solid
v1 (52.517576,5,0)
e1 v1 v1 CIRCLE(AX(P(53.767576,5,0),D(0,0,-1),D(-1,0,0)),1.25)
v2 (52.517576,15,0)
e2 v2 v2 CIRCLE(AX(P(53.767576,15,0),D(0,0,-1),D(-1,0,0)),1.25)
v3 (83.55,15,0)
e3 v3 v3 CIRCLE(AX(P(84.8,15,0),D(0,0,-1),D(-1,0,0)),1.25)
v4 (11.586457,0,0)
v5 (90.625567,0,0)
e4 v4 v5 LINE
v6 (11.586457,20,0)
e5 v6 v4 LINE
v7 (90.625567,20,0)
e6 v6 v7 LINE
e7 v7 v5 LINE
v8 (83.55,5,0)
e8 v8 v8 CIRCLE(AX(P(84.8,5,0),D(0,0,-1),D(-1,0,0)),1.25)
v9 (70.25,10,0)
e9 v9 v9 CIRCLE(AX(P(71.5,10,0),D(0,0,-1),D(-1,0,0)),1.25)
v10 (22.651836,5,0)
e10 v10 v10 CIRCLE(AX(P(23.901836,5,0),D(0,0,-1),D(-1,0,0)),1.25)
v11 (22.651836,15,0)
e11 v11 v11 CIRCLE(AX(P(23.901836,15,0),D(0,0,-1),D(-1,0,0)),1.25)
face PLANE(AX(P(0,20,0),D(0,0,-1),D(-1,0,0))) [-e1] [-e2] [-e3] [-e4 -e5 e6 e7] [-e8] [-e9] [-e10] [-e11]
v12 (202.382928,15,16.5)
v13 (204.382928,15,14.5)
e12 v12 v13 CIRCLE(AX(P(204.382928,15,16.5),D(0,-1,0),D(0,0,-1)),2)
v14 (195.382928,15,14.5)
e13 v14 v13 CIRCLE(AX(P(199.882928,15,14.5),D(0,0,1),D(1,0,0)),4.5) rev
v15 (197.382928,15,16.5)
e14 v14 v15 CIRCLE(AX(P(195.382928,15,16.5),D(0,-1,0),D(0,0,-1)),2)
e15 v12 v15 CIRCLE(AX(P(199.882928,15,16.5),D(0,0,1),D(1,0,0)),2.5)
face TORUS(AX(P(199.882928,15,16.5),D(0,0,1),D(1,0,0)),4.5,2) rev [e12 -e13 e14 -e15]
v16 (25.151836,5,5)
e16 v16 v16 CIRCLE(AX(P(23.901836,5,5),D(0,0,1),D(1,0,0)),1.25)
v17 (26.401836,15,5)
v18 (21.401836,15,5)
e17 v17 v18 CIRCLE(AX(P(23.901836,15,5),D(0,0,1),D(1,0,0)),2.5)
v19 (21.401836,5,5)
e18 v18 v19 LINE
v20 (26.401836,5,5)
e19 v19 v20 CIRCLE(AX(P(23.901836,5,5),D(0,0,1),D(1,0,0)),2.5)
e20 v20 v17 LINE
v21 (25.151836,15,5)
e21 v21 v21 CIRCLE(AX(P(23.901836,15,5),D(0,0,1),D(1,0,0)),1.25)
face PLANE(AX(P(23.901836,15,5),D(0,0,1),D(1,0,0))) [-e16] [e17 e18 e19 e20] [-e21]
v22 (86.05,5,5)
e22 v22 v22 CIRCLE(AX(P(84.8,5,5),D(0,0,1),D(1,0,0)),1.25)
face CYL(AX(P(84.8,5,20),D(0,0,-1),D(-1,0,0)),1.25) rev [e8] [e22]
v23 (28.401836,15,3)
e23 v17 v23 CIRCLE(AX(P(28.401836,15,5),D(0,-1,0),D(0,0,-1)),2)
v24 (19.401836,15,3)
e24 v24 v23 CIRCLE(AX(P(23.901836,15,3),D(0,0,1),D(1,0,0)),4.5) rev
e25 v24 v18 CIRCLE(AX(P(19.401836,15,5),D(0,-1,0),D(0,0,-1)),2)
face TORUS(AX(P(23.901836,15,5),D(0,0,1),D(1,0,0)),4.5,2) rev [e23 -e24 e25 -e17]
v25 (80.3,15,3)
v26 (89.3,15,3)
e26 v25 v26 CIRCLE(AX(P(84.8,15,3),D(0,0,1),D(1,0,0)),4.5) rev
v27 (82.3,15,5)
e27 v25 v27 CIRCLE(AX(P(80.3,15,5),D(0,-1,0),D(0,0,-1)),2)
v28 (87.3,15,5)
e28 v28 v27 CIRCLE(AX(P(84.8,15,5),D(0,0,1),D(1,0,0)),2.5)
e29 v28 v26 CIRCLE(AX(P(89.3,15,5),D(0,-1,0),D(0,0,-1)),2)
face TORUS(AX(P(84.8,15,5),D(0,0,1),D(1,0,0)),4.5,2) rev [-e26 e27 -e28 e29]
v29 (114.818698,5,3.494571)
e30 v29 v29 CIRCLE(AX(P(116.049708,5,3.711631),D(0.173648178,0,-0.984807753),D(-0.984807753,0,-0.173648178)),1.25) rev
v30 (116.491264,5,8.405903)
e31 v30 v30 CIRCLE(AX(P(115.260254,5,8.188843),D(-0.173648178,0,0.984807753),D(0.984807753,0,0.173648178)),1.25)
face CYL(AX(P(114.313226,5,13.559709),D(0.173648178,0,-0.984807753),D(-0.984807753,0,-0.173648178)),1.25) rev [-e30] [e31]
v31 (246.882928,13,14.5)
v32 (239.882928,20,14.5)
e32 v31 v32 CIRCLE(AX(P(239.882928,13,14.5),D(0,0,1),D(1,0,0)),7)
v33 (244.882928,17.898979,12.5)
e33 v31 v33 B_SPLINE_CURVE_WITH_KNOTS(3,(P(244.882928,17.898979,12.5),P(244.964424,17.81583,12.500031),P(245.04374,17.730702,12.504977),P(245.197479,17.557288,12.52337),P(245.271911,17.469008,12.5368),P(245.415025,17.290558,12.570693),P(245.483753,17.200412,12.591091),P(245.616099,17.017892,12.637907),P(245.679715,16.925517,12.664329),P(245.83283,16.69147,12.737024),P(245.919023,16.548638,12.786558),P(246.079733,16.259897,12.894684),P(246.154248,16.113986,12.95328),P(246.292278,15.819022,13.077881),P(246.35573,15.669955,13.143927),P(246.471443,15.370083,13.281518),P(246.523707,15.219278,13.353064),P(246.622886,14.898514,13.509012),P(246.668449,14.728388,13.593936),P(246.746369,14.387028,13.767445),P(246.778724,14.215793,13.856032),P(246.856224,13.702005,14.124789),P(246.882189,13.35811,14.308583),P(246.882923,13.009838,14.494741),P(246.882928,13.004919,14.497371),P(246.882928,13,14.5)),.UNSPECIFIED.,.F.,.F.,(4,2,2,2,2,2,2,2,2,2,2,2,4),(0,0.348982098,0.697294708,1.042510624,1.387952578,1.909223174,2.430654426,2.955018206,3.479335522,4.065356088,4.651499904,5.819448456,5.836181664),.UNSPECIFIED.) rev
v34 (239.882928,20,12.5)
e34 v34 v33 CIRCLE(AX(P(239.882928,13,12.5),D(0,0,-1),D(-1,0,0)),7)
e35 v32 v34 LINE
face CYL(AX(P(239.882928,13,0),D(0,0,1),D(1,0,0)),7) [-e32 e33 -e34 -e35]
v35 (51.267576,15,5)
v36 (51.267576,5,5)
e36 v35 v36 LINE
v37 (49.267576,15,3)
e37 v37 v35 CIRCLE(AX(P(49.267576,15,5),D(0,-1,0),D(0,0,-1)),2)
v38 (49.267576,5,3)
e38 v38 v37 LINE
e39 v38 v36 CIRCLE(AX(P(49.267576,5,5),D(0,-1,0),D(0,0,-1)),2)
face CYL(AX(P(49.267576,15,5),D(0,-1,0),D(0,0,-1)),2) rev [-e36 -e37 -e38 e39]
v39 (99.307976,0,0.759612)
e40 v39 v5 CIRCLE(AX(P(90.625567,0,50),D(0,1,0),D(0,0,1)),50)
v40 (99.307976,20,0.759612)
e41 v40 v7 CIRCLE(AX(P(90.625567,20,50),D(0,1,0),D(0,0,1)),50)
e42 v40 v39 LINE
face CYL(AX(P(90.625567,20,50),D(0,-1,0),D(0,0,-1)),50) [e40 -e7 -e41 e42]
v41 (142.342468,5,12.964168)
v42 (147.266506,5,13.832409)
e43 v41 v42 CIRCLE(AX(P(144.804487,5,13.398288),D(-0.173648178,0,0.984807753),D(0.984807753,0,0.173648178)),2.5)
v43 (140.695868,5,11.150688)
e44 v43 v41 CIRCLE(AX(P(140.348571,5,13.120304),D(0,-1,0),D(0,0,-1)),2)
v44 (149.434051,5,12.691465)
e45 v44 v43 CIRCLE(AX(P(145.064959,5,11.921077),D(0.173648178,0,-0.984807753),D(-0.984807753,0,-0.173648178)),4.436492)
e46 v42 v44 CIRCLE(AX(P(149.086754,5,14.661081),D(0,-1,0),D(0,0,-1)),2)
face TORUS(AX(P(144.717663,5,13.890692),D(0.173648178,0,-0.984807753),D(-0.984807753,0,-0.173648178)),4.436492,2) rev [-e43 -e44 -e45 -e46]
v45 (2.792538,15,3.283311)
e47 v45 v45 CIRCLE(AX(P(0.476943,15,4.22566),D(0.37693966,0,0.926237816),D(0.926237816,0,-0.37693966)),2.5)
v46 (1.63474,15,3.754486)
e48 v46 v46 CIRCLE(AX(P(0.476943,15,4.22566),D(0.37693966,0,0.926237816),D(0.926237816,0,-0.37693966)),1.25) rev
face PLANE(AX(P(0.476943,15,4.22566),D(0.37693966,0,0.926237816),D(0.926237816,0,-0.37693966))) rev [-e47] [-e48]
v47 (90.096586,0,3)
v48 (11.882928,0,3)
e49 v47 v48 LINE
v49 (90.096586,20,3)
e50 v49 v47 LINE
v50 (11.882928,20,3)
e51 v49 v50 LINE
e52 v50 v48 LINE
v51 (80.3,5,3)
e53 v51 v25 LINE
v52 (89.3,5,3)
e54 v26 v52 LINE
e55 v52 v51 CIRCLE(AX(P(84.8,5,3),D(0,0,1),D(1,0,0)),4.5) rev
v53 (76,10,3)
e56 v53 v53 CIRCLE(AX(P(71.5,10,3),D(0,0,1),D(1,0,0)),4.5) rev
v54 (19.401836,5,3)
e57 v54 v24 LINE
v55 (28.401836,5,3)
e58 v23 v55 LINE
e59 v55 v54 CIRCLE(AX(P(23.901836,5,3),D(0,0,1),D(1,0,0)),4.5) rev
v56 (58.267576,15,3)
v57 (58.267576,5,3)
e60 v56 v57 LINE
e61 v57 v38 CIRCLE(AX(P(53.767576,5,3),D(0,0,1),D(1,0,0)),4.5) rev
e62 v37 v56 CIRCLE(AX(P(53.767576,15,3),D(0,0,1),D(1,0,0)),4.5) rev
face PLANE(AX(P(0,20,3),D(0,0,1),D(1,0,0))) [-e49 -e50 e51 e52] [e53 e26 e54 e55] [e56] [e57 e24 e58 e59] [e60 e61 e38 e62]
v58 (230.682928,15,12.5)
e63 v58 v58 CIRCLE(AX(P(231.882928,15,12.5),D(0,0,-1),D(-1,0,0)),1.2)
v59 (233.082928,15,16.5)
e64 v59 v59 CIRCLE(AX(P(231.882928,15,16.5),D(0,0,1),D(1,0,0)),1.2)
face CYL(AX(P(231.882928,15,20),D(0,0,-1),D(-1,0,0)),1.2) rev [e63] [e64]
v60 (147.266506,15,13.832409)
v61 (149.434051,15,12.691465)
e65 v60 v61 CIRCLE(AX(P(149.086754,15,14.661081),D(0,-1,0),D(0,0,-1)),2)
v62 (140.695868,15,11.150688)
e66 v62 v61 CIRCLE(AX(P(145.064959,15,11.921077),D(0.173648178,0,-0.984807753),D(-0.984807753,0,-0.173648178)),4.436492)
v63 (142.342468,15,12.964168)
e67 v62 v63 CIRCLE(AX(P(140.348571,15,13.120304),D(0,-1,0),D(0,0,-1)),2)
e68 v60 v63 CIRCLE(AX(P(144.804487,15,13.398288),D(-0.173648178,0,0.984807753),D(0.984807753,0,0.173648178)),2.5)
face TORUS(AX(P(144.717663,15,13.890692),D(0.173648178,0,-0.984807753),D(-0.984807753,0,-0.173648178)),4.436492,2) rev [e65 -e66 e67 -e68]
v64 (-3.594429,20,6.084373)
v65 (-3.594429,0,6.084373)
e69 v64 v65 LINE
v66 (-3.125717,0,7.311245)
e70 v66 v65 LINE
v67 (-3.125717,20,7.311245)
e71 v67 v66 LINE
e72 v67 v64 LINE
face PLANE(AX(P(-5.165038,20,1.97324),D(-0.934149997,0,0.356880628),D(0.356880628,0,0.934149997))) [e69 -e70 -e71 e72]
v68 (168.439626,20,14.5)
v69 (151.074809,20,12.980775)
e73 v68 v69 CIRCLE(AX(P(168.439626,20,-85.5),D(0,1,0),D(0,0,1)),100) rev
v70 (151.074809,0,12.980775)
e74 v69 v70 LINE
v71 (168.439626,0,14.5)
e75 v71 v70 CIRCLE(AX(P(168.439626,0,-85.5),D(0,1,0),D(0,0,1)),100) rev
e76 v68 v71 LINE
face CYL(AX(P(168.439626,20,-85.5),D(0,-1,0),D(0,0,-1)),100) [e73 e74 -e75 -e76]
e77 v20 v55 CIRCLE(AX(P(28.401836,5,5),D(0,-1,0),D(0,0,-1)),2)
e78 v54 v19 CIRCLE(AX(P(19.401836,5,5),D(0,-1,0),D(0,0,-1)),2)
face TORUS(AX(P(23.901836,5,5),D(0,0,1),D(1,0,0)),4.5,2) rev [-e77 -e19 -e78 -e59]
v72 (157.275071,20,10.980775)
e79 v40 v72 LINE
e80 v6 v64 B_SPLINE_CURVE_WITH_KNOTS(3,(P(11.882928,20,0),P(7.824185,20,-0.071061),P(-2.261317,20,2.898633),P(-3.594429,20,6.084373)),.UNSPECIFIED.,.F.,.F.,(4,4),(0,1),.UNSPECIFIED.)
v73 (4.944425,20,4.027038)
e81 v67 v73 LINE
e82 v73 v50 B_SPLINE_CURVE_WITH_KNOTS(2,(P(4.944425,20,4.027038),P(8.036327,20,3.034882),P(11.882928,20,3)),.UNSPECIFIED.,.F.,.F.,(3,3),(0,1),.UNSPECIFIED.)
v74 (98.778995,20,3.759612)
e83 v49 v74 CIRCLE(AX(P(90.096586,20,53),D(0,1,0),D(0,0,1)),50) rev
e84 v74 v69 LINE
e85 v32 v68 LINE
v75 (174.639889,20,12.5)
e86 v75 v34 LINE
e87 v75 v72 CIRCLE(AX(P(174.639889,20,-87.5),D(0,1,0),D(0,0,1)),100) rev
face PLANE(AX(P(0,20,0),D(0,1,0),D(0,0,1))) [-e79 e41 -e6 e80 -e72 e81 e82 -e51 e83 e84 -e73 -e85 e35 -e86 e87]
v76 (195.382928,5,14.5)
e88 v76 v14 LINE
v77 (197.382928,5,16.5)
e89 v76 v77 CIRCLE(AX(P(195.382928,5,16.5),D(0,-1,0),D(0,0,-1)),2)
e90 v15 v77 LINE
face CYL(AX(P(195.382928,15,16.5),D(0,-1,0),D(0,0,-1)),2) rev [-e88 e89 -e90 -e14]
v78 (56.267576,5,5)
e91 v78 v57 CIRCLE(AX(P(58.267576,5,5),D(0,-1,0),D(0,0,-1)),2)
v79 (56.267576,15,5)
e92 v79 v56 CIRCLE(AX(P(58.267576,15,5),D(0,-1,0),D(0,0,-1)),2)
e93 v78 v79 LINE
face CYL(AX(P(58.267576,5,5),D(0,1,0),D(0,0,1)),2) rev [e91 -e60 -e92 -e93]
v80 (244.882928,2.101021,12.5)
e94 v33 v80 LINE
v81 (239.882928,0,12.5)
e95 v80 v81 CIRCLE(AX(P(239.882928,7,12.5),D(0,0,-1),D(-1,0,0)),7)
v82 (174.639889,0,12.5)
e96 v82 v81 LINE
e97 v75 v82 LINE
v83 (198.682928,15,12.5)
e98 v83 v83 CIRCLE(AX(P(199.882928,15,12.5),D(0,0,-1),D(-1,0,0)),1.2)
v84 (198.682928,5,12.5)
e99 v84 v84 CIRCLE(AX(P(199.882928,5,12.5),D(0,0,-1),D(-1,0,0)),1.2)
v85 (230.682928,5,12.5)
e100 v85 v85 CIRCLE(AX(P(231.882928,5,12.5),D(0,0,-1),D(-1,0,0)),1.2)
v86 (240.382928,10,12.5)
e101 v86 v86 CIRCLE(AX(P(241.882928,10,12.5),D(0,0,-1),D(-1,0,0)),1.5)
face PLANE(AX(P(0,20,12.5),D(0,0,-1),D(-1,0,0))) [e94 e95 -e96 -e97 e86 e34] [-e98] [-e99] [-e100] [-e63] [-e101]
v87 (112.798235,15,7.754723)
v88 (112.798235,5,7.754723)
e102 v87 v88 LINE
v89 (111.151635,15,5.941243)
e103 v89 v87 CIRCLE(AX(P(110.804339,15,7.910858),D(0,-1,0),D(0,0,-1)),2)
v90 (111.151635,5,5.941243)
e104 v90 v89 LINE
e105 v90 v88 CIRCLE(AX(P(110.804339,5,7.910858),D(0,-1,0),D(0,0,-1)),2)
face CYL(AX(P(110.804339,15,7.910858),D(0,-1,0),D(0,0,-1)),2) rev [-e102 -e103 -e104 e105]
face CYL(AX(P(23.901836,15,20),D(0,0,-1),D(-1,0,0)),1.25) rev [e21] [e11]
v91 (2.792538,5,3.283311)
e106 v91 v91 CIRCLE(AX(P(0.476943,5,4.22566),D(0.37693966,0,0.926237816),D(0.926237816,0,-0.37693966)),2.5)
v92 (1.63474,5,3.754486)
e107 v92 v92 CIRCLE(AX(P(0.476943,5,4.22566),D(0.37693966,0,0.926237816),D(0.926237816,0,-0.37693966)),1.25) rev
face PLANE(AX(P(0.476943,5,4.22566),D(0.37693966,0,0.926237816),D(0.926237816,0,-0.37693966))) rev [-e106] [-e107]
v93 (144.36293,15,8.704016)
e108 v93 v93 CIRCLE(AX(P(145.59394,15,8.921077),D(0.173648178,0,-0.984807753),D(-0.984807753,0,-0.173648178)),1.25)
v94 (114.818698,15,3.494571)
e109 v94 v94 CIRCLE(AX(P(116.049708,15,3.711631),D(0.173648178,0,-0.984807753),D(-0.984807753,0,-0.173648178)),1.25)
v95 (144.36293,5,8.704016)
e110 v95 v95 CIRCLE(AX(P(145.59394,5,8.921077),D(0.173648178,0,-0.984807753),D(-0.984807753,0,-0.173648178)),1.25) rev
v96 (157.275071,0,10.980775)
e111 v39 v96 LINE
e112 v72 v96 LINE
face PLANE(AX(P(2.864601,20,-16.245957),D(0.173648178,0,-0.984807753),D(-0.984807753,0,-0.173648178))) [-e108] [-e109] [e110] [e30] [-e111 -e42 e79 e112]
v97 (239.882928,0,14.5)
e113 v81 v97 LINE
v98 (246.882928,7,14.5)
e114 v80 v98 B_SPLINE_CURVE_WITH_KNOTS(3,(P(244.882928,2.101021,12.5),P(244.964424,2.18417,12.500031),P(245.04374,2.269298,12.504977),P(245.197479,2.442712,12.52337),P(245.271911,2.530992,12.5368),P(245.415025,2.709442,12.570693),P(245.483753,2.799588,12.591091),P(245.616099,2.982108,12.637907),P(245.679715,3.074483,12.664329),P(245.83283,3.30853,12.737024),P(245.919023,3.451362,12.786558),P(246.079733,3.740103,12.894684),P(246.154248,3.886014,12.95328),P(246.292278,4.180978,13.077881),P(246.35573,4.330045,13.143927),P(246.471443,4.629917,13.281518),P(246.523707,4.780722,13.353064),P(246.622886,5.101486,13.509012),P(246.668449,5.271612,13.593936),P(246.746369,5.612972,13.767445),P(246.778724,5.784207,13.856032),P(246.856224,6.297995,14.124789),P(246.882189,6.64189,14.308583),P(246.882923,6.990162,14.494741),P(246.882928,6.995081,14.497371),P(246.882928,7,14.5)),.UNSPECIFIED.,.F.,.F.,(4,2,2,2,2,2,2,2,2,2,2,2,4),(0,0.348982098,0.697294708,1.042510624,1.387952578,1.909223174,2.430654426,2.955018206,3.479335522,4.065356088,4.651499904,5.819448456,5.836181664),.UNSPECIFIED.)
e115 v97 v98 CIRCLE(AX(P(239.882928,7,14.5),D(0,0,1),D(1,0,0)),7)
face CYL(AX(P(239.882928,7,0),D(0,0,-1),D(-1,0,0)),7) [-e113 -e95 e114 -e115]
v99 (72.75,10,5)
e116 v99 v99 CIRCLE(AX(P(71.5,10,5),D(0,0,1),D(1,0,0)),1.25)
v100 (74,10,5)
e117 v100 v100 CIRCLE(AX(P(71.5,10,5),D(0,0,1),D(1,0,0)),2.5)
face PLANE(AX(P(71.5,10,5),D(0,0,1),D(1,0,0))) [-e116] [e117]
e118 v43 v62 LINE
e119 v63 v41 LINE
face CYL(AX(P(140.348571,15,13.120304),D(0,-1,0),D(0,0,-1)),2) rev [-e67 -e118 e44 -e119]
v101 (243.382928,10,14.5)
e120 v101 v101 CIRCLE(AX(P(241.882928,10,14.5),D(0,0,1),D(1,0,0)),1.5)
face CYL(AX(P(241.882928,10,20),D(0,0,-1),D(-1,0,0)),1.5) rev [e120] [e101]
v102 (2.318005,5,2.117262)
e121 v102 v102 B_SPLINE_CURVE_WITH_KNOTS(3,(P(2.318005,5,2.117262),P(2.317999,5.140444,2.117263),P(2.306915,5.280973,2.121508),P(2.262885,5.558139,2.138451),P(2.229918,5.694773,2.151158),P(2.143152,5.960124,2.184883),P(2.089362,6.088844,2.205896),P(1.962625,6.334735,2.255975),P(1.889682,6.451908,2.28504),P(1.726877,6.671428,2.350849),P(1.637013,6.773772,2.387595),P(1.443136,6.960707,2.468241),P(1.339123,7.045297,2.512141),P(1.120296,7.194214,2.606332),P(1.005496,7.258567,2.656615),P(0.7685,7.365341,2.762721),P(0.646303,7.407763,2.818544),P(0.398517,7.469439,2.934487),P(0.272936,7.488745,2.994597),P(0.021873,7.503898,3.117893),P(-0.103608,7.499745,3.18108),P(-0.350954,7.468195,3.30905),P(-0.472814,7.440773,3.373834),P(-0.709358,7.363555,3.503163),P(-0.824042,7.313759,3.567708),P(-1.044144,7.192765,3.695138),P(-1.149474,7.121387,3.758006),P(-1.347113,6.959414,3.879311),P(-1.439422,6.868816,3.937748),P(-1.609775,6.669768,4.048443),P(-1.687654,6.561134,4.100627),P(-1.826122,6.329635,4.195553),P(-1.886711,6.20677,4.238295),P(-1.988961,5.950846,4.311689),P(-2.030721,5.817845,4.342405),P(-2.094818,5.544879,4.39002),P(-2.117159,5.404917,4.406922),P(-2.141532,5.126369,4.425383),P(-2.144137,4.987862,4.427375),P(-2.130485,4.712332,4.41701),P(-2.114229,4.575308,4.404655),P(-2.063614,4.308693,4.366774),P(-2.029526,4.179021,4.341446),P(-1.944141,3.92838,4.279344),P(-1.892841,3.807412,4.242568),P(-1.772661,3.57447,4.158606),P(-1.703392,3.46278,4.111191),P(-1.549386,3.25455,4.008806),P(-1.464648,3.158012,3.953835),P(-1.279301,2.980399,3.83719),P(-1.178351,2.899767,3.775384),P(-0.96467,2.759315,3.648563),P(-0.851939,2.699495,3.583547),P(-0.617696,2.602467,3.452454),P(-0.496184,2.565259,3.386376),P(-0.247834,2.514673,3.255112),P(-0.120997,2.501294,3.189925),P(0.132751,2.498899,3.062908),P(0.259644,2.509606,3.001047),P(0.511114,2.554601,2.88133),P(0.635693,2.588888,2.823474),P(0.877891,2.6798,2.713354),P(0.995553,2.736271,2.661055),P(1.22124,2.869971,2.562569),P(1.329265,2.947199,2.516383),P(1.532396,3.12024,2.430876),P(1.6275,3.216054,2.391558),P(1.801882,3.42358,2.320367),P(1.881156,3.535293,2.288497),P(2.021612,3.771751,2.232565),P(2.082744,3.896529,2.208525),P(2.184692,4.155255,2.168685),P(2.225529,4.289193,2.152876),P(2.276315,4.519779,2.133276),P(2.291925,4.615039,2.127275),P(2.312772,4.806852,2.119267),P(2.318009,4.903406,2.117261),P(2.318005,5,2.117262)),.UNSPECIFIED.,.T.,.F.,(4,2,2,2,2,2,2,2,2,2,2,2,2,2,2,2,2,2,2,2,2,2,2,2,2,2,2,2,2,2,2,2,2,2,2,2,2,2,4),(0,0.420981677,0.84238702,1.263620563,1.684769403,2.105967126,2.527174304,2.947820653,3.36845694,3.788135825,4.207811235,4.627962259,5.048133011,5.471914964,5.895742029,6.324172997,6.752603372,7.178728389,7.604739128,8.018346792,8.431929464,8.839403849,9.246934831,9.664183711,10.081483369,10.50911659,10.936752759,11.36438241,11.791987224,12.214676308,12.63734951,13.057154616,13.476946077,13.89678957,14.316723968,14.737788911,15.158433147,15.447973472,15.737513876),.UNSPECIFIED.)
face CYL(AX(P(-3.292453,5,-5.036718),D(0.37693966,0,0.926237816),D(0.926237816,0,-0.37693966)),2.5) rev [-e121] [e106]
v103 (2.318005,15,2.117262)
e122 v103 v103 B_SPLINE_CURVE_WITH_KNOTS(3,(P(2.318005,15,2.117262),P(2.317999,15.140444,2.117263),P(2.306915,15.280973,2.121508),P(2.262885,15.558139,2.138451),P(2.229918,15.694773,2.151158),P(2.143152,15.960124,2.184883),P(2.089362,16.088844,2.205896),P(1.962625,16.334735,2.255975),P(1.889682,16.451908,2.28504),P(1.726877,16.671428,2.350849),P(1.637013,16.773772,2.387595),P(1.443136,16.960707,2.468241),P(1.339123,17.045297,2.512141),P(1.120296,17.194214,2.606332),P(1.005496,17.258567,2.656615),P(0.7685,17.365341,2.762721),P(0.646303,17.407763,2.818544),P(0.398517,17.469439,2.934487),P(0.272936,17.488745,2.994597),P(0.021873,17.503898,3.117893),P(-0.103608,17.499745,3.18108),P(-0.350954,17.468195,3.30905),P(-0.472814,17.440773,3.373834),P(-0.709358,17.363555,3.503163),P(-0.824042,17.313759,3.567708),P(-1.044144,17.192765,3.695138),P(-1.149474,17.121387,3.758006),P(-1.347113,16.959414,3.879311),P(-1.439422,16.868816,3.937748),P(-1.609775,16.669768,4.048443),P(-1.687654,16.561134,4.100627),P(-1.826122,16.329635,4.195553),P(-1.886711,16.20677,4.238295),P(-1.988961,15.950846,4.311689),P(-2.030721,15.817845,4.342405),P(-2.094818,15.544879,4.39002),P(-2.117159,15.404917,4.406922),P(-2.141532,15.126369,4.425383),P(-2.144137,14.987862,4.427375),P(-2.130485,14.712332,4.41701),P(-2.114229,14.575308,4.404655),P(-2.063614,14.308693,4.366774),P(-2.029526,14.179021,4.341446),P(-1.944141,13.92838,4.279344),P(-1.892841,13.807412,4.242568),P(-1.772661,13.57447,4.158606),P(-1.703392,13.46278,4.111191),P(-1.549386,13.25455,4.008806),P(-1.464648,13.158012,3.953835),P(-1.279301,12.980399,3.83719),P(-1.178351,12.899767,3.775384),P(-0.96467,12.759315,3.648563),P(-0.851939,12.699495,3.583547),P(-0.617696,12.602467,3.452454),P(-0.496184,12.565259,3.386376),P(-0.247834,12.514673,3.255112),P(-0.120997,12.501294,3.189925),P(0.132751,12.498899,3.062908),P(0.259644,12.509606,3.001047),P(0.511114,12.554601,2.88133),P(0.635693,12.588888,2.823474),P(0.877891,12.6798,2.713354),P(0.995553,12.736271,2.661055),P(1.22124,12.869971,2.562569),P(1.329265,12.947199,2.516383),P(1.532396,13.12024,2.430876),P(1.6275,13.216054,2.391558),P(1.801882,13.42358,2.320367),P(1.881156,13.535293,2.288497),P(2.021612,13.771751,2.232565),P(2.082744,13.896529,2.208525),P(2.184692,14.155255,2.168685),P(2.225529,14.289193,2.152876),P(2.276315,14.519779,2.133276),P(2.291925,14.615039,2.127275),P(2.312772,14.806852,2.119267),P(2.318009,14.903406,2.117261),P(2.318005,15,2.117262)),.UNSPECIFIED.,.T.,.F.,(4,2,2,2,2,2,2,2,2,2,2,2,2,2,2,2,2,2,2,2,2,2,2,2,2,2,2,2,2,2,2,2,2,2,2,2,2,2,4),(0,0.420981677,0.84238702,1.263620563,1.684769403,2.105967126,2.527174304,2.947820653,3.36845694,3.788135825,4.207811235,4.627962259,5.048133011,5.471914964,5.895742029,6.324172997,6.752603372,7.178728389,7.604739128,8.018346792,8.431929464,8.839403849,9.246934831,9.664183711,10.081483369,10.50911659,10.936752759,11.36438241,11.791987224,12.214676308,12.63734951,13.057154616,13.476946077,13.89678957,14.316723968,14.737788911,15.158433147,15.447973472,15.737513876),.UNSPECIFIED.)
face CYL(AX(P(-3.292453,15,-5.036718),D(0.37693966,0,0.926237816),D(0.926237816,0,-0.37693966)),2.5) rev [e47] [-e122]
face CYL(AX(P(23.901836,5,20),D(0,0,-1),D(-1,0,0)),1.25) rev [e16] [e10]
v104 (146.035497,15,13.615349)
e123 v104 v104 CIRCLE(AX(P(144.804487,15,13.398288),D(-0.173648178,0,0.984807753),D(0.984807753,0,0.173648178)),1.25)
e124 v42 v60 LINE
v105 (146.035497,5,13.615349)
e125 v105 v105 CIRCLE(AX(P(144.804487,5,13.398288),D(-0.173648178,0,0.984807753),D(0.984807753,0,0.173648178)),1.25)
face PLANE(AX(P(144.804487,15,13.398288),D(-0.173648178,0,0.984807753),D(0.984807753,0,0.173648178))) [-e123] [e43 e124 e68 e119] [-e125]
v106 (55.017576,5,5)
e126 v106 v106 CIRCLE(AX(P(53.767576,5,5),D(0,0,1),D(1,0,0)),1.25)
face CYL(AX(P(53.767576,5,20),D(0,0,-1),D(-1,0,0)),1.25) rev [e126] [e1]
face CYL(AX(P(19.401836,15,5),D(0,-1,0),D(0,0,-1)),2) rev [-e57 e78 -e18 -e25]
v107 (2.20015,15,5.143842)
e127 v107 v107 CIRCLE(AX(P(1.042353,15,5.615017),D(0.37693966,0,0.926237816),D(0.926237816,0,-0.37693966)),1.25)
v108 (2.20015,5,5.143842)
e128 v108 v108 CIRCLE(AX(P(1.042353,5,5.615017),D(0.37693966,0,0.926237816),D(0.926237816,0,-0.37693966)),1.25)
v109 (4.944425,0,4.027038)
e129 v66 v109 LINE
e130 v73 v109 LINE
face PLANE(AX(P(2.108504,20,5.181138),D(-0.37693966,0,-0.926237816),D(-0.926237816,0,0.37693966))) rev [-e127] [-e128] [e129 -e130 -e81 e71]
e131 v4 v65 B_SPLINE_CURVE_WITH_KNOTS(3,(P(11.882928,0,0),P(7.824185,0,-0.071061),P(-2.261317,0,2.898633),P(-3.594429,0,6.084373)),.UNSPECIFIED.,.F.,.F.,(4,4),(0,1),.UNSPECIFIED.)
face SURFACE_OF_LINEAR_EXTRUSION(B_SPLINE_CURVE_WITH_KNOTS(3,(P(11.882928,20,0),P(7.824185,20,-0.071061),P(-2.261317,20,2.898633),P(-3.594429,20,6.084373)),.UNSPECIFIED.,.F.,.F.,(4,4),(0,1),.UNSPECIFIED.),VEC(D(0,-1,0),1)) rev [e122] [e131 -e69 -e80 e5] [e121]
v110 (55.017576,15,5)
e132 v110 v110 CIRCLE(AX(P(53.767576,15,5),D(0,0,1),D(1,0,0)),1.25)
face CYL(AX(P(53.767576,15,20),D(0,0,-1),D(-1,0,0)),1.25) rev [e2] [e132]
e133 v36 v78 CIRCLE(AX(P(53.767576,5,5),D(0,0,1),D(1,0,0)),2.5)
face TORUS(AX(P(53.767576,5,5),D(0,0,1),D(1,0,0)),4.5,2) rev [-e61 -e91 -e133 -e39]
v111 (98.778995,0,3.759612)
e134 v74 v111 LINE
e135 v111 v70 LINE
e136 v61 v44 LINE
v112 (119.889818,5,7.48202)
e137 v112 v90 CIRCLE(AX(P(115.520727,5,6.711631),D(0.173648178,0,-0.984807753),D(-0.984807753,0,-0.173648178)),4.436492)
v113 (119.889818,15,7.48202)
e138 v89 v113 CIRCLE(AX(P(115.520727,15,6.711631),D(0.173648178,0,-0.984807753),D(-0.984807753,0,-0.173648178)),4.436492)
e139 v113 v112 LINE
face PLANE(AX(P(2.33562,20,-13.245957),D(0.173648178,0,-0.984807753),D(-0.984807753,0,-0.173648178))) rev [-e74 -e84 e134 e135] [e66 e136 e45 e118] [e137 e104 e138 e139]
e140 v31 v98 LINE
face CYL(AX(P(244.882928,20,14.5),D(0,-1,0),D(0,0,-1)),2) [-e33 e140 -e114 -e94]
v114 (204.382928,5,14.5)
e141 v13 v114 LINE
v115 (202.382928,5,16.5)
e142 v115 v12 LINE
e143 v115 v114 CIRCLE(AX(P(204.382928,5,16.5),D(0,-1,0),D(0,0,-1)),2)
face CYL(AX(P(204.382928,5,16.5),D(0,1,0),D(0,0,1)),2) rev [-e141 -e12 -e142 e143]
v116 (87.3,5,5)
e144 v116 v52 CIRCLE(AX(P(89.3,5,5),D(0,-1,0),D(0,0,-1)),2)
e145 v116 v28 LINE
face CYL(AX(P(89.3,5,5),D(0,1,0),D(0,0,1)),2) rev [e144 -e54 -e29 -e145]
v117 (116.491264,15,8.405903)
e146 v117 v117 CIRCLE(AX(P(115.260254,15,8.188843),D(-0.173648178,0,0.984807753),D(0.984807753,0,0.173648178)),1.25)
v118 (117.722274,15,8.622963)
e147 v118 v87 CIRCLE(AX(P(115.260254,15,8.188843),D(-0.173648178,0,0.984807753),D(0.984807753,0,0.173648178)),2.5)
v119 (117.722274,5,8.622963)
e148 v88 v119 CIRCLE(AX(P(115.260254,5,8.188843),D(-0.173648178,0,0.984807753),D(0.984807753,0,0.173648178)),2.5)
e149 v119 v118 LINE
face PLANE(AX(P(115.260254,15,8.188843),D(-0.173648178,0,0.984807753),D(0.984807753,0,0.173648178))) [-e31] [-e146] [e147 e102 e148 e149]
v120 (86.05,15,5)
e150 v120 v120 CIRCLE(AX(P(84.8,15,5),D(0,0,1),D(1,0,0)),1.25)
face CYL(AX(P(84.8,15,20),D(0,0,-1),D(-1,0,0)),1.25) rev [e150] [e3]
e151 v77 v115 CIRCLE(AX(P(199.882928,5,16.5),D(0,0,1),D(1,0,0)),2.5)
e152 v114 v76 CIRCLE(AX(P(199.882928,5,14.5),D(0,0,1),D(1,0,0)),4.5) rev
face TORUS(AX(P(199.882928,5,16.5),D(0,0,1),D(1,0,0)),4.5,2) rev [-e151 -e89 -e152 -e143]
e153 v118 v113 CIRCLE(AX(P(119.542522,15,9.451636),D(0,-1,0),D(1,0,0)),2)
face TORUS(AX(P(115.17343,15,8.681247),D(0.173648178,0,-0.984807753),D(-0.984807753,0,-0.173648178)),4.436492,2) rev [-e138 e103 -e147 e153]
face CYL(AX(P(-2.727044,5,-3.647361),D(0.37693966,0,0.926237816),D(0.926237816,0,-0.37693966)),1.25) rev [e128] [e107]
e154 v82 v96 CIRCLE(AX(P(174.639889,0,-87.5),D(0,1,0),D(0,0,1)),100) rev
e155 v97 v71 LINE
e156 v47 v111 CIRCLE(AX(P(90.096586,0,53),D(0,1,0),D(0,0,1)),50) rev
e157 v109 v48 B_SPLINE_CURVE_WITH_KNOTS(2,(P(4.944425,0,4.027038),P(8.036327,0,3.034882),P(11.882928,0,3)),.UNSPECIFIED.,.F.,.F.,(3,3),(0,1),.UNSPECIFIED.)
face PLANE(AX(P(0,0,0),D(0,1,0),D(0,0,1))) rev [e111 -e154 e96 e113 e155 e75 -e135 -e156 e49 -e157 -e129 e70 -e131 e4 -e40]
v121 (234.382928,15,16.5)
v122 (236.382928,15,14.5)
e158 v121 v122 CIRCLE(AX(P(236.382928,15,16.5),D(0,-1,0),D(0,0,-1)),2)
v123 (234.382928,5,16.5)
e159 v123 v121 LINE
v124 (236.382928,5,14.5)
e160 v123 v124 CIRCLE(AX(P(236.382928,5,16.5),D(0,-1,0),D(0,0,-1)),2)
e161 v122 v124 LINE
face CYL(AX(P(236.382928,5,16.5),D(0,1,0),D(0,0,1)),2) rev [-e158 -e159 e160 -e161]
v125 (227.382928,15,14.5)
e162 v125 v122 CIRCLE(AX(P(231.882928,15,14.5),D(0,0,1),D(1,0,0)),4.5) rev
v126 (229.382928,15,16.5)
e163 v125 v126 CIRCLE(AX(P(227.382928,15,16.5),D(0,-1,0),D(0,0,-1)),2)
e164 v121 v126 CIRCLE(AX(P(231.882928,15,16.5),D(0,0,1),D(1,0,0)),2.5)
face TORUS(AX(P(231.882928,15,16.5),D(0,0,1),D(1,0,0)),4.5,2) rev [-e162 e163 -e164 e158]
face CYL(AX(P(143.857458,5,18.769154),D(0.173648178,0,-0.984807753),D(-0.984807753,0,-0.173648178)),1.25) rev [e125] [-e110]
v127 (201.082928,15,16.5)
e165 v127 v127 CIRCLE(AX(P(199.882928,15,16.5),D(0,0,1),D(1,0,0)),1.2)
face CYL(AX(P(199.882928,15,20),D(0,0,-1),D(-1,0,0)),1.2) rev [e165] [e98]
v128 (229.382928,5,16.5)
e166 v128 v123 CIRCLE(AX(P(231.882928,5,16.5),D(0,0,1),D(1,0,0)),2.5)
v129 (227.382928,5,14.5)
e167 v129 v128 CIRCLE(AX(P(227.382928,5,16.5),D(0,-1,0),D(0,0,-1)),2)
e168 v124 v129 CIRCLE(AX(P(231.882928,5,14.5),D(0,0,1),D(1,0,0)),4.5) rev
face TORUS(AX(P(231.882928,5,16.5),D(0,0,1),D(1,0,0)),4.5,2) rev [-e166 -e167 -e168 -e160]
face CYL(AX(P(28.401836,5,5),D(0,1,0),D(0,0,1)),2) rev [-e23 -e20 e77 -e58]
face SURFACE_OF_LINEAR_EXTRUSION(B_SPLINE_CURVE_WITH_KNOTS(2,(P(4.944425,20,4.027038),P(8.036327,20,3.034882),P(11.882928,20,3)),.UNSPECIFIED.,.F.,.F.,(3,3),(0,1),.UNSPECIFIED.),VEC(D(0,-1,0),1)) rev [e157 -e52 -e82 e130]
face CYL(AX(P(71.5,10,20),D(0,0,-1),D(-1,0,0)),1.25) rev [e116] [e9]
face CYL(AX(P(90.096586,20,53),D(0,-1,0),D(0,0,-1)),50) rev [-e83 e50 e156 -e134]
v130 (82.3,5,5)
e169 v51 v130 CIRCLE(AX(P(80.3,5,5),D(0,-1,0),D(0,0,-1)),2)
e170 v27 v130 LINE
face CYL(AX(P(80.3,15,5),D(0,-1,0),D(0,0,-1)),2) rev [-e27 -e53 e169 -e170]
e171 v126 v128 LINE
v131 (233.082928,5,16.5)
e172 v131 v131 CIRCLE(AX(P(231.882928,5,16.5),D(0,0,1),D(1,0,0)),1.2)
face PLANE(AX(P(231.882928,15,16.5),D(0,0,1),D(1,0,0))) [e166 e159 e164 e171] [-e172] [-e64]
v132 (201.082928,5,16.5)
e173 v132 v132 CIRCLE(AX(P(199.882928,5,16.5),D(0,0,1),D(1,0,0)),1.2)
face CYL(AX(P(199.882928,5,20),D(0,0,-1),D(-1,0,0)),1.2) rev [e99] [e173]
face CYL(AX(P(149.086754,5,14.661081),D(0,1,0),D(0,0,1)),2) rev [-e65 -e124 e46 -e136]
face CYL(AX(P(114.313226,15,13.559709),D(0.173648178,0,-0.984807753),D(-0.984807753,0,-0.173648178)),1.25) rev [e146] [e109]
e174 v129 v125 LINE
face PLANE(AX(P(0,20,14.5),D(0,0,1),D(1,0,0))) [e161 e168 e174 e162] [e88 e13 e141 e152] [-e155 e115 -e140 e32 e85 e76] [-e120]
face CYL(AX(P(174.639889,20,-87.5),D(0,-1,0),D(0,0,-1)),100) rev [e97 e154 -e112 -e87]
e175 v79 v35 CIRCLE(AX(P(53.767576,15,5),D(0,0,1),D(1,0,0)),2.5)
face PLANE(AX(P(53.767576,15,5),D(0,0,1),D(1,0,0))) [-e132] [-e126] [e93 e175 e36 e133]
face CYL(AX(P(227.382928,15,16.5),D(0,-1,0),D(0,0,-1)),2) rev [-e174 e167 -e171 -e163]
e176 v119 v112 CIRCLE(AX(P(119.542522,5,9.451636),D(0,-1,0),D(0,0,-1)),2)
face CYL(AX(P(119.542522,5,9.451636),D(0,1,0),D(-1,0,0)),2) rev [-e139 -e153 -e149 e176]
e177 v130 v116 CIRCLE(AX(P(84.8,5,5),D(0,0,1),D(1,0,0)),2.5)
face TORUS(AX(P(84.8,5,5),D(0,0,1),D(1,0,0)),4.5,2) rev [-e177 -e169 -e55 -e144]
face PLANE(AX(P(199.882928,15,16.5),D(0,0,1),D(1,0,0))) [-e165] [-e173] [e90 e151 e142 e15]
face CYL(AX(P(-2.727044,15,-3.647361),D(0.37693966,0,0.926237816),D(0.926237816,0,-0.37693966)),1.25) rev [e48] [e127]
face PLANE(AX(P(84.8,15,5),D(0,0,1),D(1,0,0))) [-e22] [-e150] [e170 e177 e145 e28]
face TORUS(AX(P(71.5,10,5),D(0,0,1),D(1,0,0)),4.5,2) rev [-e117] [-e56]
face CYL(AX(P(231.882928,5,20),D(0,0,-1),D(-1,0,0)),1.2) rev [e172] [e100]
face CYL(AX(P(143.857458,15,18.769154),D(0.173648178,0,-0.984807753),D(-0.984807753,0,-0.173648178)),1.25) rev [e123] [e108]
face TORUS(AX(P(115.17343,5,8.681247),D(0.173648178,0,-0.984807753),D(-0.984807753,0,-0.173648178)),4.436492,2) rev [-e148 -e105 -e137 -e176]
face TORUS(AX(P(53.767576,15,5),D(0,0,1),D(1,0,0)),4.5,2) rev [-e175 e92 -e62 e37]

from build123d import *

# Parameters (mm, degrees)
EXTRUDE_1_DEPTH     = 20
SKETCH_2_R          = 1.25
SKETCH_2_R_2        = 1.2
SKETCH_2_R_3        = 1.5
CUT_EXTRUDE_1_DEPTH = 20
SKETCH_3_R          = 1.25
CUT_EXTRUDE_2_DEPTH = 10
SKETCH_6_R          = 1.25
CUT_EXTRUDE_3_DEPTH = 10
CUT_EXTRUDE_START   = -1.5
SKETCH_7_R          = 2.5
CUT_EXTRUDE_4_DEPTH = 10
FILLET_2_R          = 7
FILLET_4_R          = 2
SKETCH_8_R          = 2.5
SKETCH_8_R_2        = 1.25
EXTRUDE_2_DEPTH     = 2
SKETCH_9_R          = 1.2
EXTRUDE_3_DEPTH     = 2
SKETCH_10_R         = 1.25
EXTRUDE_4_DEPTH     = 1.5
FILLET_5_R          = 2


with BuildPart() as part:
    # Эскиз1 → Бобышка-Вытянуть1 (new body)
    with BuildSketch(Plane(origin=(0, 0, 0), x_dir=(1, 0, 0), z_dir=(0, 1, 0))):
        with BuildLine():
            add(Edge.make_bspline(
                [(11.586456911, 0), (7.354184674, -0.068879004), (-2.292700231, -2.973629634), (-3.594429032, -6.084373142)],
                knots=[0.023541254, 0.023541254, 0.023541254, 0.023541254, 1, 1, 1, 1], degree=3))
            Line((-3.594429032, -6.084373142), (-3.125717465, -7.311245307))
            Line((-3.125717465, -7.311245307), (4.944424909, -4.027038302))
            add(Edge.make_bspline(
                [(4.944424909, -4.027038302), (8.036327036, -3.034882344), (11.882927706, -3)],
                knots=[0, 0, 0, 1, 1, 1], degree=2))
            Line((11.882927706, -3), (90.096585882, -3))
            ThreePointArc((90.096585882, -3), (94.454373019, -3.190265095), (98.778994765, -3.759612349))
            Line((98.778994765, -3.759612349), (151.074808569, -12.980775301))
            ThreePointArc((151.074808569, -12.980775301), (159.724052061, -14.119469809), (168.439626336, -14.5))
            Line((168.439626336, -14.5), (246.882927706, -14.5))
            Line((246.882927706, -14.5), (246.882927706, -12.5))
            Line((246.882927706, -12.5), (174.639889098, -12.5))
            ThreePointArc((174.639889098, -12.5), (165.924314823, -12.119469809), (157.275071331, -10.980775301))
            Line((157.275071331, -10.980775301), (99.307975707, -0.759612349))
            ThreePointArc((99.307975707, -0.759612349), (97.143592887, -0.426667086), (94.966707435, -0.188811516))
            ThreePointArc((94.966707435, -0.188811516), (92.798189179, -0.047225181), (90.625566824, 0))
            Line((90.625566824, 0), (11.586456911, 0))
        make_face()
    extrude(amount=EXTRUDE_1_DEPTH)

    # Эскиз2 → Вырез-Вытянуть1 (cut)
    with BuildSketch(Plane(origin=(0, 0, 0), x_dir=(-1, 0, 0), z_dir=(0, 0, -1))):
        with Locations((-23.901835852, 5)):
            Circle(SKETCH_2_R)
        with Locations((-23.901835852, 15)):
            Circle(SKETCH_2_R)
        with Locations((-53.767576073, 15)):
            Circle(SKETCH_2_R)
        with Locations((-53.767576073, 5)):
            Circle(SKETCH_2_R)
        with Locations((-71.5, 10)):
            Circle(SKETCH_2_R)
        with Locations((-84.8, 15)):
            Circle(SKETCH_2_R)
        with Locations((-84.8, 5)):
            Circle(SKETCH_2_R)
        with Locations((-231.882927706, 5)):
            Circle(SKETCH_2_R_2)
        with Locations((-199.882927706, 5)):
            Circle(SKETCH_2_R_2)
        with Locations((-199.882927706, 15)):
            Circle(SKETCH_2_R_2)
        with Locations((-231.882927706, 15)):
            Circle(SKETCH_2_R_2)
        with Locations((-241.882927706, 10)):
            Circle(SKETCH_2_R_3)
    extrude(amount=-CUT_EXTRUDE_1_DEPTH, mode=Mode.SUBTRACT)

    # Эскиз3 → Вырез-Вытянуть2 (cut)
    with BuildSketch(Plane(origin=(2.864600513, 0, -16.245956808), x_dir=(-0.9848077530122085, 0, -0.17364817766692825), z_dir=(0.17364817766692825, 0, -0.9848077530122085))):
        with Locations((-114.931169712, 15)):
            Circle(SKETCH_3_R)
        with Locations((-144.931169712, 15)):
            Circle(SKETCH_3_R)
        with Locations((-114.931169712, 5)):
            Circle(SKETCH_3_R)
        with Locations((-144.931169712, 5)):
            Circle(SKETCH_3_R)
    extrude(amount=-CUT_EXTRUDE_2_DEPTH, mode=Mode.SUBTRACT)

    # Эскиз6 → Вырез-Вытянуть3 (cut)
    with BuildSketch(Plane(origin=(2.107232026, 0, 5.181655942), x_dir=(0.926237816407285, 0, -0.37693966023365694), z_dir=(0.3769396602336569, 0, 0.9262378164072849))):
        with Locations((-1.149682401, 15)):
            Circle(SKETCH_6_R)
        with Locations((-1.149682401, 5)):
            Circle(SKETCH_6_R)
    extrude(amount=-CUT_EXTRUDE_3_DEPTH, mode=Mode.SUBTRACT)

    # Эскиз7 → Вырез-Вытянуть4 (cut)
    with BuildSketch(Plane(origin=(2.107232026, 0, 5.181655942), x_dir=(0.926237816407285, 0, -0.37693966023365694), z_dir=(0.3769396602336569, 0, 0.9262378164072849)).offset(CUT_EXTRUDE_START)):
        with Locations((-1.149682401, 15)):
            Circle(SKETCH_7_R)
        with Locations((-1.149682401, 5)):
            Circle(SKETCH_7_R)
    extrude(amount=-CUT_EXTRUDE_4_DEPTH, mode=Mode.SUBTRACT)

    # Скругление2
    fillet_2_edges = [part.edges().sort_by_distance(p)[0] for p in [
        (246.882927706, 0, 13.5),
        (246.882927706, 20, 13.5),
    ]]
    fillet(fillet_2_edges, radius=FILLET_2_R)

    # Скругление4
    # the kernel refuses this fillet: 2 mm, written as the material it takes off along each edge
    with BuildSketch(Plane(origin=(246.882927706, 2, 12.5), x_dir=(0, 0, 1), z_dir=(0, 1, 0))) as fillet_4_piece_1:
        with BuildLine():
            CenterArc((FILLET_4_R, -FILLET_4_R), FILLET_4_R, 90, 90)
            Line((0, -FILLET_4_R), (0, 0))
            Line((0, 0), (FILLET_4_R, 0))
        make_face()
    extrude(amount=16, mode=Mode.SUBTRACT)

    # Эскиз8 → Бобышка-Вытянуть2 (add)
    # profile 1 of 4: a face of its own
    with BuildSketch(Plane.XY.offset(3)):
        with Locations((71.5, 10)):
            Circle(SKETCH_8_R)
        with Locations(Location((71.5, 10, 0), (0, 0, 180))):
            Circle(SKETCH_8_R_2, mode=Mode.SUBTRACT)
    # profile 2 of 4: a face of its own
    with BuildSketch(Plane.XY.offset(3)):
        with BuildLine():
            Line((21.401835852, 15), (21.401835852, 5))
            ThreePointArc((21.401835852, 5), (23.901835852, 2.5), (26.401835852, 5))
            Line((26.401835852, 5), (26.401835852, 15))
            ThreePointArc((26.401835852, 15), (23.901835852, 17.5), (21.401835852, 15))
        make_face()
        with Locations(Location((23.901835852, 15, 0), (0, 0, 180))):
            Circle(SKETCH_8_R_2, mode=Mode.SUBTRACT)
        with Locations(Location((23.901835852, 5, 0), (0, 0, 180))):
            Circle(SKETCH_8_R_2, mode=Mode.SUBTRACT)
    # profile 3 of 4: a face of its own
    with BuildSketch(Plane.XY.offset(3)):
        with BuildLine():
            Line((56.267576073, 5), (56.267576073, 15))
            ThreePointArc((56.267576073, 15), (53.767576073, 17.5), (51.267576073, 15))
            Line((51.267576073, 15), (51.267576073, 5))
            ThreePointArc((51.267576073, 5), (53.767576073, 2.5), (56.267576073, 5))
        make_face()
        with Locations(Location((53.767576073, 15, 0), (0, 0, 180))):
            Circle(SKETCH_8_R_2, mode=Mode.SUBTRACT)
        with Locations(Location((53.767576073, 5, 0), (0, 0, 180))):
            Circle(SKETCH_8_R_2, mode=Mode.SUBTRACT)
    # profile 4 of 4: a face of its own
    with BuildSketch(Plane.XY.offset(3)):
        with BuildLine():
            Line((87.3, 5), (87.3, 15))
            ThreePointArc((87.3, 15), (84.8, 17.5), (82.3, 15))
            Line((82.3, 15), (82.3, 5))
            ThreePointArc((82.3, 5), (84.8, 2.5), (87.3, 5))
        make_face()
        with Locations(Location((84.8, 15, 0), (0, 0, 180))):
            Circle(SKETCH_8_R_2, mode=Mode.SUBTRACT)
        with Locations(Location((84.8, 5, 0), (0, 0, 180))):
            Circle(SKETCH_8_R_2, mode=Mode.SUBTRACT)
    extrude(amount=EXTRUDE_2_DEPTH)

    # Эскиз9 → Бобышка-Вытянуть3 (add)
    # profile 1 of 2: a face of its own
    with BuildSketch(Plane.XY.offset(14.5)):
        with BuildLine():
            Line((197.382927706, 15), (197.382927706, 5))
            ThreePointArc((197.382927706, 5), (199.882927706, 2.5), (202.382927706, 5))
            Line((202.382927706, 5), (202.382927706, 15))
            ThreePointArc((202.382927706, 15), (199.882927706, 17.5), (197.382927706, 15))
        make_face()
        with Locations(Location((199.882927706, 15, 0), (0, 0, 180))):
            Circle(SKETCH_9_R, mode=Mode.SUBTRACT)
        with Locations(Location((199.882927706, 5, 0), (0, 0, 180))):
            Circle(SKETCH_9_R, mode=Mode.SUBTRACT)
    # profile 2 of 2: a face of its own
    with BuildSketch(Plane.XY.offset(14.5)):
        with BuildLine():
            Line((234.382927706, 5), (234.382927706, 15))
            ThreePointArc((234.382927706, 15), (231.882927706, 17.5), (229.382927706, 15))
            Line((229.382927706, 15), (229.382927706, 5))
            ThreePointArc((229.382927706, 5), (231.882927706, 2.5), (234.382927706, 5))
        make_face()
        with Locations(Location((231.882927706, 15, 0), (0, 0, 180))):
            Circle(SKETCH_9_R, mode=Mode.SUBTRACT)
        with Locations(Location((231.882927706, 5, 0), (0, 0, 180))):
            Circle(SKETCH_9_R, mode=Mode.SUBTRACT)
    extrude(amount=EXTRUDE_3_DEPTH)

    # Эскиз10 → Бобышка-Вытянуть4 (add)
    # profile 1 of 2: a face of its own
    with BuildSketch(Plane(origin=(2.335619571, 0, -13.245956808), x_dir=(0.9848077530122086, 0, 0.17364817766692767), z_dir=(-0.17364817766692767, 0, 0.9848077530122087))):
        with BuildLine():
            Line((112.431169712, 15), (112.431169712, 5))
            ThreePointArc((112.431169712, 5), (114.931169712, 2.5), (117.431169712, 5))
            Line((117.431169712, 5), (117.431169712, 15))
            ThreePointArc((117.431169712, 15), (114.931169712, 17.5), (112.431169712, 15))
        make_face()
        with Locations(Location((114.931169712, 15, 0), (0, 0, 180))):
            Circle(SKETCH_10_R, mode=Mode.SUBTRACT)
        with Locations(Location((114.931169712, 5, 0), (0, 0, 180))):
            Circle(SKETCH_10_R, mode=Mode.SUBTRACT)
    # profile 2 of 2: a face of its own
    with BuildSketch(Plane(origin=(2.335619571, 0, -13.245956808), x_dir=(0.9848077530122086, 0, 0.17364817766692767), z_dir=(-0.17364817766692767, 0, 0.9848077530122087))):
        with BuildLine():
            Line((142.431169712, 15), (142.431169712, 5))
            ThreePointArc((142.431169712, 5), (144.931169712, 2.5), (147.431169712, 5))
            Line((147.431169712, 5), (147.431169712, 15))
            ThreePointArc((147.431169712, 15), (144.931169712, 17.5), (142.431169712, 15))
        make_face()
        with Locations(Location((144.931169712, 5, 0), (0, 0, 180))):
            Circle(SKETCH_10_R, mode=Mode.SUBTRACT)
        with Locations(Location((144.931169712, 15, 0), (0, 0, 180))):
            Circle(SKETCH_10_R, mode=Mode.SUBTRACT)
    extrude(amount=EXTRUDE_4_DEPTH)

    # Скругление5
    # the kernel refuses this fillet: 2 mm, written as the material it adds along each edge
    with BuildSketch(Plane(origin=(23.901835852, 15, 3), x_dir=(1, 0, 0), z_dir=(0, -1, 0))) as fillet_5_piece_1:
        with BuildLine():
            CenterArc((2.5 + FILLET_5_R, FILLET_5_R), FILLET_5_R, 180, 90)
            Line((2.5, FILLET_5_R), (2.5 - FILLET_5_R * 0.02, FILLET_5_R))
            Line((2.5 - FILLET_5_R * 0.02, FILLET_5_R), (2.5 - FILLET_5_R * 0.02, -FILLET_5_R * 0.02))
            Line((2.5 - FILLET_5_R * 0.02, -FILLET_5_R * 0.02), (2.5 + FILLET_5_R, -FILLET_5_R * 0.02))
            Line((2.5 + FILLET_5_R, -FILLET_5_R * 0.02), (2.5 + FILLET_5_R, 0))
        make_face()
    revolve(axis=Axis((23.901835852, 15, 3), (0, 0, 1)), revolution_arc=180)
    with BuildSketch(Plane(origin=(26.401835852, 5, 3), x_dir=(1, 0, 0), z_dir=(0, 1, 0)), Plane(origin=(21.401835852, 15, 3), x_dir=(-1, 0, 0), z_dir=(0, -1, 0)), Plane(origin=(234.382927706, 5, 14.5), x_dir=(1, 0, 0), z_dir=(0, 1, 0)), Plane(origin=(202.382927706, 5, 14.5), x_dir=(1, 0, 0), z_dir=(0, 1, 0)), Plane(origin=(87.3, 5, 3), x_dir=(1, 0, 0), z_dir=(0, 1, 0)), Plane(origin=(56.267576073, 5, 3), x_dir=(1, 0, 0), z_dir=(0, 1, 0)), Plane(origin=(229.382927706, 15, 14.5), x_dir=(-1, 0, 0), z_dir=(0, -1, 0)), Plane(origin=(197.382927706, 15, 14.5), x_dir=(-1, 0, 0), z_dir=(0, -1, 0)), Plane(origin=(82.3, 15, 3), x_dir=(-1, 0, 0), z_dir=(0, -1, 0)), Plane(origin=(51.267576073, 15, 3), x_dir=(-1, 0, 0), z_dir=(0, -1, 0))) as fillet_5_piece_2:
        with BuildLine():
            CenterArc((FILLET_5_R, -FILLET_5_R), FILLET_5_R, 90, 90)
            Line((0, -FILLET_5_R), (-FILLET_5_R * 0.02, -FILLET_5_R))
            Line((-FILLET_5_R * 0.02, -FILLET_5_R), (-FILLET_5_R * 0.02, FILLET_5_R * 0.02))
            Line((-FILLET_5_R * 0.02, FILLET_5_R * 0.02), (FILLET_5_R, FILLET_5_R * 0.02))
            Line((FILLET_5_R, FILLET_5_R * 0.02), (FILLET_5_R, 0))
        make_face()
    extrude(amount=10)
    with BuildSketch(Plane(origin=(23.901835852, 5, 3), x_dir=(-1, 0, 0), z_dir=(0, 1, 0))) as fillet_5_piece_3:
        with BuildLine():
            CenterArc((2.5 + FILLET_5_R, FILLET_5_R), FILLET_5_R, 180, 90)
            Line((2.5, FILLET_5_R), (2.5 - FILLET_5_R * 0.02, FILLET_5_R))
            Line((2.5 - FILLET_5_R * 0.02, FILLET_5_R), (2.5 - FILLET_5_R * 0.02, -FILLET_5_R * 0.02))
            Line((2.5 - FILLET_5_R * 0.02, -FILLET_5_R * 0.02), (2.5 + FILLET_5_R, -FILLET_5_R * 0.02))
            Line((2.5 + FILLET_5_R, -FILLET_5_R * 0.02), (2.5 + FILLET_5_R, 0))
        make_face()
    revolve(axis=Axis((23.901835852, 5, 3), (0, 0, 1)), revolution_arc=180)
    with BuildSketch(Plane(origin=(231.882927706, 15, 14.5), x_dir=(1, 0, 0), z_dir=(0, -1, 0))) as fillet_5_piece_4:
        with BuildLine():
            CenterArc((2.5 + FILLET_5_R, FILLET_5_R), FILLET_5_R, 180, 90)
            Line((2.5, FILLET_5_R), (2.5 - FILLET_5_R * 0.02, FILLET_5_R))
            Line((2.5 - FILLET_5_R * 0.02, FILLET_5_R), (2.5 - FILLET_5_R * 0.02, -FILLET_5_R * 0.02))
            Line((2.5 - FILLET_5_R * 0.02, -FILLET_5_R * 0.02), (2.5 + FILLET_5_R, -FILLET_5_R * 0.0200000000001))
            Line((2.5 + FILLET_5_R, -FILLET_5_R * 0.0200000000001), (2.5 + FILLET_5_R, 0))
        make_face()
    revolve(axis=Axis((231.882927706, 15, 14.5), (0, 0, 1)), revolution_arc=180)
    with BuildSketch(Plane(origin=(231.882927706, 5, 14.5), x_dir=(-1, 0, 0), z_dir=(0, 1, 0))) as fillet_5_piece_5:
        with BuildLine():
            CenterArc((2.5 + FILLET_5_R, FILLET_5_R), FILLET_5_R, 180, 90)
            Line((2.5, FILLET_5_R), (2.5 - FILLET_5_R * 0.02, FILLET_5_R))
            Line((2.5 - FILLET_5_R * 0.02, FILLET_5_R), (2.5 - FILLET_5_R * 0.02, -FILLET_5_R * 0.02))
            Line((2.5 - FILLET_5_R * 0.02, -FILLET_5_R * 0.02), (2.5 + FILLET_5_R, -FILLET_5_R * 0.0200000000001))
            Line((2.5 + FILLET_5_R, -FILLET_5_R * 0.0200000000001), (2.5 + FILLET_5_R, 0))
        make_face()
    revolve(axis=Axis((231.882927706, 5, 14.5), (0, 0, 1)), revolution_arc=180)
    with BuildSketch(Plane(origin=(199.882927706, 15, 14.5), x_dir=(1, 0, 0), z_dir=(0, -1, 0))) as fillet_5_piece_6:
        with BuildLine():
            CenterArc((2.5 + FILLET_5_R, FILLET_5_R), FILLET_5_R, 180, 90)
            Line((2.5, FILLET_5_R), (2.5 - FILLET_5_R * 0.02, FILLET_5_R))
            Line((2.5 - FILLET_5_R * 0.02, FILLET_5_R), (2.5 - FILLET_5_R * 0.02, -FILLET_5_R * 0.02))
            Line((2.5 - FILLET_5_R * 0.02, -FILLET_5_R * 0.02), (2.5 + FILLET_5_R, -FILLET_5_R * 0.0200000000001))
            Line((2.5 + FILLET_5_R, -FILLET_5_R * 0.0200000000001), (2.5 + FILLET_5_R, 0))
        make_face()
    revolve(axis=Axis((199.882927706, 15, 14.5), (0, 0, 1)), revolution_arc=180)
    with BuildSketch(Plane(origin=(199.882927706, 5, 14.5), x_dir=(-1, 0, 0), z_dir=(0, 1, 0))) as fillet_5_piece_7:
        with BuildLine():
            CenterArc((2.5 + FILLET_5_R, FILLET_5_R), FILLET_5_R, 180, 90)
            Line((2.5, FILLET_5_R), (2.5 - FILLET_5_R * 0.02, FILLET_5_R))
            Line((2.5 - FILLET_5_R * 0.02, FILLET_5_R), (2.5 - FILLET_5_R * 0.02, -FILLET_5_R * 0.02))
            Line((2.5 - FILLET_5_R * 0.02, -FILLET_5_R * 0.02), (2.5 + FILLET_5_R, -FILLET_5_R * 0.0200000000001))
            Line((2.5 + FILLET_5_R, -FILLET_5_R * 0.0200000000001), (2.5 + FILLET_5_R, 0))
        make_face()
    revolve(axis=Axis((199.882927706, 5, 14.5), (0, 0, 1)), revolution_arc=180)
    with BuildSketch(Plane(origin=(145.064959156, 15, 11.9210767), x_dir=(0.9848077530122088, 0, 0.17364817766692653), z_dir=(0, -1, 0))) as fillet_5_piece_8:
        with BuildLine():
            CenterArc((4.436491673, 2), FILLET_5_R, 194.477512186, 75.522487814)
            Line((2.5, 1.5), (2.461270167, 1.49))
            ThreePointArc((2.461270167, 1.49), (2.46, 0.75), (2.46, 0))
            Line((2.46, 0), (2.5, -0.04))
            Line((2.5, -0.04), (4.436491673, -0.04))
            Line((4.436491673, -0.04), (4.436491673, 0))
        make_face()
    revolve(axis=Axis((145.064959156, 15, 11.9210767), (-0.17364817766692767, 0, 0.9848077530122087)), revolution_arc=180)
    with BuildSketch(Plane(origin=(147.526978539, 5, 12.355197144), x_dir=(0.9848077530122076, 0, 0.17364817766693302), z_dir=(0, 1, 0)), Plane(origin=(117.982745949, 5, 7.145751814), x_dir=(0.9848077530122087, -2.8421709430404017e-15, 0.1736481776669272), z_dir=(0, 1, 0)), Plane(origin=(142.602939774, 15, 11.486956256), x_dir=(-0.9848077530122094, 0, -0.17364817766692311), z_dir=(0, -1, 0)), Plane(origin=(113.058707184, 15, 6.277510926), x_dir=(-0.9848077530122087, 0, -0.17364817766692664), z_dir=(0, -1, 0))) as fillet_5_piece_9:
        with BuildLine():
            CenterArc((1.936491673, -2), FILLET_5_R, 90, 75.522487814)
            Line((0, -1.5), (-0.038729833, -1.49))
            ThreePointArc((-0.038729833, -1.49), (-0.04, -0.75), (-0.04, 0))
            Line((-0.04, 0), (0, 0.04))
            Line((0, 0.04), (1.936491673, 0.04))
            Line((1.936491673, 0.04), (1.936491673, 0))
        make_face()
    extrude(amount=10)
    with BuildSketch(Plane(origin=(145.064959156, 5, 11.9210767), x_dir=(-0.9848077530122086, 0, -0.17364817766692708), z_dir=(0, 1, 0))) as fillet_5_piece_10:
        with BuildLine():
            CenterArc((4.436491673, 2), FILLET_5_R, 194.477512186, 75.522487814)
            Line((2.5, 1.5), (2.461270167, 1.49))
            ThreePointArc((2.461270167, 1.49), (2.46, 0.75), (2.46, 0))
            Line((2.46, 0), (2.5, -0.04))
            Line((2.5, -0.04), (4.436491673, -0.04))
            Line((4.436491673, -0.04), (4.436491673, 0))
        make_face()
    revolve(axis=Axis((145.064959156, 5, 11.9210767), (-0.17364817766692767, 0, 0.9848077530122087)), revolution_arc=180)
    with BuildSketch(Plane(origin=(115.520726566, 15, 6.71163137), x_dir=(0.9848077530122084, 2.8421709430403926e-15, 0.1736481776669289), z_dir=(0, -1, 0))) as fillet_5_piece_11:
        with BuildLine():
            CenterArc((4.436491673, 2), FILLET_5_R, 194.477512186, 75.522487814)
            Line((2.5, 1.5), (2.461270167, 1.49))
            ThreePointArc((2.461270167, 1.49), (2.46, 0.75), (2.46, 0))
            Line((2.46, 0), (2.5, -0.04))
            Line((2.5, -0.04), (4.436491673, -0.04))
            Line((4.436491673, -0.04), (4.436491673, 0))
        make_face()
    revolve(axis=Axis((115.520726566, 15, 6.71163137), (-0.17364817766692767, 0, 0.9848077530122087)), revolution_arc=180)
    with BuildSketch(Plane(origin=(115.520726566, 5, 6.71163137), x_dir=(-0.9848077530122086, 0, -0.1736481776669275), z_dir=(0, 1, 0))) as fillet_5_piece_12:
        with BuildLine():
            CenterArc((4.436491673, 2), FILLET_5_R, 194.477512186, 75.522487814)
            Line((2.5, 1.5), (2.461270167, 1.49))
            ThreePointArc((2.461270167, 1.49), (2.46, 0.75), (2.46, 0))
            Line((2.46, 0), (2.5, -0.04))
            Line((2.5, -0.04), (4.436491673, -0.04))
            Line((4.436491673, -0.04), (4.436491673, 0))
        make_face()
    revolve(axis=Axis((115.520726566, 5, 6.71163137), (-0.17364817766692767, 0, 0.9848077530122087)), revolution_arc=180)
    with BuildSketch(Plane(origin=(84.8, 15, 3), x_dir=(1, 0, 0), z_dir=(0, -1, 0))) as fillet_5_piece_13:
        with BuildLine():
            CenterArc((2.5 + FILLET_5_R, FILLET_5_R), FILLET_5_R, 180, 90)
            Line((2.5, FILLET_5_R), (2.5 - FILLET_5_R * 0.02, FILLET_5_R))
            Line((2.5 - FILLET_5_R * 0.02, FILLET_5_R), (2.5 - FILLET_5_R * 0.02, -FILLET_5_R * 0.02))
            Line((2.5 - FILLET_5_R * 0.02, -FILLET_5_R * 0.02), (2.5 + FILLET_5_R, -FILLET_5_R * 0.02))
            Line((2.5 + FILLET_5_R, -FILLET_5_R * 0.02), (2.5 + FILLET_5_R, 0))
        make_face()
    revolve(axis=Axis((84.8, 15, 3), (0, 0, 1)), revolution_arc=180)
    with BuildSketch(Plane(origin=(84.8, 5, 3), x_dir=(-1, 0, 0), z_dir=(0, 1, 0))) as fillet_5_piece_14:
        with BuildLine():
            CenterArc((2.5 + FILLET_5_R, FILLET_5_R), FILLET_5_R, 180, 90)
            Line((2.5, FILLET_5_R), (2.5 - FILLET_5_R * 0.02, FILLET_5_R))
            Line((2.5 - FILLET_5_R * 0.02, FILLET_5_R), (2.5 - FILLET_5_R * 0.02, -FILLET_5_R * 0.02))
            Line((2.5 - FILLET_5_R * 0.02, -FILLET_5_R * 0.02), (2.5 + FILLET_5_R, -FILLET_5_R * 0.02))
            Line((2.5 + FILLET_5_R, -FILLET_5_R * 0.02), (2.5 + FILLET_5_R, 0))
        make_face()
    revolve(axis=Axis((84.8, 5, 3), (0, 0, 1)), revolution_arc=180)
    with BuildSketch(Plane(origin=(53.767576073, 15, 3), x_dir=(1, 0, 0), z_dir=(0, -1, 0))) as fillet_5_piece_15:
        with BuildLine():
            CenterArc((2.5 + FILLET_5_R, FILLET_5_R), FILLET_5_R, 180, 90)
            Line((2.5, FILLET_5_R), (2.5 - FILLET_5_R * 0.02, FILLET_5_R))
            Line((2.5 - FILLET_5_R * 0.02, FILLET_5_R), (2.5 - FILLET_5_R * 0.02, -FILLET_5_R * 0.02))
            Line((2.5 - FILLET_5_R * 0.02, -FILLET_5_R * 0.02), (2.5 + FILLET_5_R, -FILLET_5_R * 0.02))
            Line((2.5 + FILLET_5_R, -FILLET_5_R * 0.02), (2.5 + FILLET_5_R, 0))
        make_face()
    revolve(axis=Axis((53.767576073, 15, 3), (0, 0, 1)), revolution_arc=180)
    with BuildSketch(Plane(origin=(53.767576073, 5, 3), x_dir=(-1, 0, 0), z_dir=(0, 1, 0))) as fillet_5_piece_16:
        with BuildLine():
            CenterArc((2.5 + FILLET_5_R, FILLET_5_R), FILLET_5_R, 180, 90)
            Line((2.5, FILLET_5_R), (2.5 - FILLET_5_R * 0.02, FILLET_5_R))
            Line((2.5 - FILLET_5_R * 0.02, FILLET_5_R), (2.5 - FILLET_5_R * 0.02, -FILLET_5_R * 0.02))
            Line((2.5 - FILLET_5_R * 0.02, -FILLET_5_R * 0.02), (2.5 + FILLET_5_R, -FILLET_5_R * 0.02))
            Line((2.5 + FILLET_5_R, -FILLET_5_R * 0.02), (2.5 + FILLET_5_R, 0))
        make_face()
    revolve(axis=Axis((53.767576073, 5, 3), (0, 0, 1)), revolution_arc=180)
    with BuildSketch(Plane(origin=(71.5, 10, 3), x_dir=(1, 0, 0), z_dir=(0, -1, 0))) as fillet_5_piece_17:
        with BuildLine():
            CenterArc((2.5 + FILLET_5_R, FILLET_5_R), FILLET_5_R, 180, 90)
            Line((2.5, FILLET_5_R), (2.5 - FILLET_5_R * 0.02, FILLET_5_R))
            Line((2.5 - FILLET_5_R * 0.02, FILLET_5_R), (2.5 - FILLET_5_R * 0.02, -FILLET_5_R * 0.02))
            Line((2.5 - FILLET_5_R * 0.02, -FILLET_5_R * 0.02), (2.5 + FILLET_5_R, -FILLET_5_R * 0.02))
            Line((2.5 + FILLET_5_R, -FILLET_5_R * 0.02), (2.5 + FILLET_5_R, 0))
        make_face()
    revolve(axis=Axis((71.5, 10, 3), (0, 0, 1)))


solid = part.part
